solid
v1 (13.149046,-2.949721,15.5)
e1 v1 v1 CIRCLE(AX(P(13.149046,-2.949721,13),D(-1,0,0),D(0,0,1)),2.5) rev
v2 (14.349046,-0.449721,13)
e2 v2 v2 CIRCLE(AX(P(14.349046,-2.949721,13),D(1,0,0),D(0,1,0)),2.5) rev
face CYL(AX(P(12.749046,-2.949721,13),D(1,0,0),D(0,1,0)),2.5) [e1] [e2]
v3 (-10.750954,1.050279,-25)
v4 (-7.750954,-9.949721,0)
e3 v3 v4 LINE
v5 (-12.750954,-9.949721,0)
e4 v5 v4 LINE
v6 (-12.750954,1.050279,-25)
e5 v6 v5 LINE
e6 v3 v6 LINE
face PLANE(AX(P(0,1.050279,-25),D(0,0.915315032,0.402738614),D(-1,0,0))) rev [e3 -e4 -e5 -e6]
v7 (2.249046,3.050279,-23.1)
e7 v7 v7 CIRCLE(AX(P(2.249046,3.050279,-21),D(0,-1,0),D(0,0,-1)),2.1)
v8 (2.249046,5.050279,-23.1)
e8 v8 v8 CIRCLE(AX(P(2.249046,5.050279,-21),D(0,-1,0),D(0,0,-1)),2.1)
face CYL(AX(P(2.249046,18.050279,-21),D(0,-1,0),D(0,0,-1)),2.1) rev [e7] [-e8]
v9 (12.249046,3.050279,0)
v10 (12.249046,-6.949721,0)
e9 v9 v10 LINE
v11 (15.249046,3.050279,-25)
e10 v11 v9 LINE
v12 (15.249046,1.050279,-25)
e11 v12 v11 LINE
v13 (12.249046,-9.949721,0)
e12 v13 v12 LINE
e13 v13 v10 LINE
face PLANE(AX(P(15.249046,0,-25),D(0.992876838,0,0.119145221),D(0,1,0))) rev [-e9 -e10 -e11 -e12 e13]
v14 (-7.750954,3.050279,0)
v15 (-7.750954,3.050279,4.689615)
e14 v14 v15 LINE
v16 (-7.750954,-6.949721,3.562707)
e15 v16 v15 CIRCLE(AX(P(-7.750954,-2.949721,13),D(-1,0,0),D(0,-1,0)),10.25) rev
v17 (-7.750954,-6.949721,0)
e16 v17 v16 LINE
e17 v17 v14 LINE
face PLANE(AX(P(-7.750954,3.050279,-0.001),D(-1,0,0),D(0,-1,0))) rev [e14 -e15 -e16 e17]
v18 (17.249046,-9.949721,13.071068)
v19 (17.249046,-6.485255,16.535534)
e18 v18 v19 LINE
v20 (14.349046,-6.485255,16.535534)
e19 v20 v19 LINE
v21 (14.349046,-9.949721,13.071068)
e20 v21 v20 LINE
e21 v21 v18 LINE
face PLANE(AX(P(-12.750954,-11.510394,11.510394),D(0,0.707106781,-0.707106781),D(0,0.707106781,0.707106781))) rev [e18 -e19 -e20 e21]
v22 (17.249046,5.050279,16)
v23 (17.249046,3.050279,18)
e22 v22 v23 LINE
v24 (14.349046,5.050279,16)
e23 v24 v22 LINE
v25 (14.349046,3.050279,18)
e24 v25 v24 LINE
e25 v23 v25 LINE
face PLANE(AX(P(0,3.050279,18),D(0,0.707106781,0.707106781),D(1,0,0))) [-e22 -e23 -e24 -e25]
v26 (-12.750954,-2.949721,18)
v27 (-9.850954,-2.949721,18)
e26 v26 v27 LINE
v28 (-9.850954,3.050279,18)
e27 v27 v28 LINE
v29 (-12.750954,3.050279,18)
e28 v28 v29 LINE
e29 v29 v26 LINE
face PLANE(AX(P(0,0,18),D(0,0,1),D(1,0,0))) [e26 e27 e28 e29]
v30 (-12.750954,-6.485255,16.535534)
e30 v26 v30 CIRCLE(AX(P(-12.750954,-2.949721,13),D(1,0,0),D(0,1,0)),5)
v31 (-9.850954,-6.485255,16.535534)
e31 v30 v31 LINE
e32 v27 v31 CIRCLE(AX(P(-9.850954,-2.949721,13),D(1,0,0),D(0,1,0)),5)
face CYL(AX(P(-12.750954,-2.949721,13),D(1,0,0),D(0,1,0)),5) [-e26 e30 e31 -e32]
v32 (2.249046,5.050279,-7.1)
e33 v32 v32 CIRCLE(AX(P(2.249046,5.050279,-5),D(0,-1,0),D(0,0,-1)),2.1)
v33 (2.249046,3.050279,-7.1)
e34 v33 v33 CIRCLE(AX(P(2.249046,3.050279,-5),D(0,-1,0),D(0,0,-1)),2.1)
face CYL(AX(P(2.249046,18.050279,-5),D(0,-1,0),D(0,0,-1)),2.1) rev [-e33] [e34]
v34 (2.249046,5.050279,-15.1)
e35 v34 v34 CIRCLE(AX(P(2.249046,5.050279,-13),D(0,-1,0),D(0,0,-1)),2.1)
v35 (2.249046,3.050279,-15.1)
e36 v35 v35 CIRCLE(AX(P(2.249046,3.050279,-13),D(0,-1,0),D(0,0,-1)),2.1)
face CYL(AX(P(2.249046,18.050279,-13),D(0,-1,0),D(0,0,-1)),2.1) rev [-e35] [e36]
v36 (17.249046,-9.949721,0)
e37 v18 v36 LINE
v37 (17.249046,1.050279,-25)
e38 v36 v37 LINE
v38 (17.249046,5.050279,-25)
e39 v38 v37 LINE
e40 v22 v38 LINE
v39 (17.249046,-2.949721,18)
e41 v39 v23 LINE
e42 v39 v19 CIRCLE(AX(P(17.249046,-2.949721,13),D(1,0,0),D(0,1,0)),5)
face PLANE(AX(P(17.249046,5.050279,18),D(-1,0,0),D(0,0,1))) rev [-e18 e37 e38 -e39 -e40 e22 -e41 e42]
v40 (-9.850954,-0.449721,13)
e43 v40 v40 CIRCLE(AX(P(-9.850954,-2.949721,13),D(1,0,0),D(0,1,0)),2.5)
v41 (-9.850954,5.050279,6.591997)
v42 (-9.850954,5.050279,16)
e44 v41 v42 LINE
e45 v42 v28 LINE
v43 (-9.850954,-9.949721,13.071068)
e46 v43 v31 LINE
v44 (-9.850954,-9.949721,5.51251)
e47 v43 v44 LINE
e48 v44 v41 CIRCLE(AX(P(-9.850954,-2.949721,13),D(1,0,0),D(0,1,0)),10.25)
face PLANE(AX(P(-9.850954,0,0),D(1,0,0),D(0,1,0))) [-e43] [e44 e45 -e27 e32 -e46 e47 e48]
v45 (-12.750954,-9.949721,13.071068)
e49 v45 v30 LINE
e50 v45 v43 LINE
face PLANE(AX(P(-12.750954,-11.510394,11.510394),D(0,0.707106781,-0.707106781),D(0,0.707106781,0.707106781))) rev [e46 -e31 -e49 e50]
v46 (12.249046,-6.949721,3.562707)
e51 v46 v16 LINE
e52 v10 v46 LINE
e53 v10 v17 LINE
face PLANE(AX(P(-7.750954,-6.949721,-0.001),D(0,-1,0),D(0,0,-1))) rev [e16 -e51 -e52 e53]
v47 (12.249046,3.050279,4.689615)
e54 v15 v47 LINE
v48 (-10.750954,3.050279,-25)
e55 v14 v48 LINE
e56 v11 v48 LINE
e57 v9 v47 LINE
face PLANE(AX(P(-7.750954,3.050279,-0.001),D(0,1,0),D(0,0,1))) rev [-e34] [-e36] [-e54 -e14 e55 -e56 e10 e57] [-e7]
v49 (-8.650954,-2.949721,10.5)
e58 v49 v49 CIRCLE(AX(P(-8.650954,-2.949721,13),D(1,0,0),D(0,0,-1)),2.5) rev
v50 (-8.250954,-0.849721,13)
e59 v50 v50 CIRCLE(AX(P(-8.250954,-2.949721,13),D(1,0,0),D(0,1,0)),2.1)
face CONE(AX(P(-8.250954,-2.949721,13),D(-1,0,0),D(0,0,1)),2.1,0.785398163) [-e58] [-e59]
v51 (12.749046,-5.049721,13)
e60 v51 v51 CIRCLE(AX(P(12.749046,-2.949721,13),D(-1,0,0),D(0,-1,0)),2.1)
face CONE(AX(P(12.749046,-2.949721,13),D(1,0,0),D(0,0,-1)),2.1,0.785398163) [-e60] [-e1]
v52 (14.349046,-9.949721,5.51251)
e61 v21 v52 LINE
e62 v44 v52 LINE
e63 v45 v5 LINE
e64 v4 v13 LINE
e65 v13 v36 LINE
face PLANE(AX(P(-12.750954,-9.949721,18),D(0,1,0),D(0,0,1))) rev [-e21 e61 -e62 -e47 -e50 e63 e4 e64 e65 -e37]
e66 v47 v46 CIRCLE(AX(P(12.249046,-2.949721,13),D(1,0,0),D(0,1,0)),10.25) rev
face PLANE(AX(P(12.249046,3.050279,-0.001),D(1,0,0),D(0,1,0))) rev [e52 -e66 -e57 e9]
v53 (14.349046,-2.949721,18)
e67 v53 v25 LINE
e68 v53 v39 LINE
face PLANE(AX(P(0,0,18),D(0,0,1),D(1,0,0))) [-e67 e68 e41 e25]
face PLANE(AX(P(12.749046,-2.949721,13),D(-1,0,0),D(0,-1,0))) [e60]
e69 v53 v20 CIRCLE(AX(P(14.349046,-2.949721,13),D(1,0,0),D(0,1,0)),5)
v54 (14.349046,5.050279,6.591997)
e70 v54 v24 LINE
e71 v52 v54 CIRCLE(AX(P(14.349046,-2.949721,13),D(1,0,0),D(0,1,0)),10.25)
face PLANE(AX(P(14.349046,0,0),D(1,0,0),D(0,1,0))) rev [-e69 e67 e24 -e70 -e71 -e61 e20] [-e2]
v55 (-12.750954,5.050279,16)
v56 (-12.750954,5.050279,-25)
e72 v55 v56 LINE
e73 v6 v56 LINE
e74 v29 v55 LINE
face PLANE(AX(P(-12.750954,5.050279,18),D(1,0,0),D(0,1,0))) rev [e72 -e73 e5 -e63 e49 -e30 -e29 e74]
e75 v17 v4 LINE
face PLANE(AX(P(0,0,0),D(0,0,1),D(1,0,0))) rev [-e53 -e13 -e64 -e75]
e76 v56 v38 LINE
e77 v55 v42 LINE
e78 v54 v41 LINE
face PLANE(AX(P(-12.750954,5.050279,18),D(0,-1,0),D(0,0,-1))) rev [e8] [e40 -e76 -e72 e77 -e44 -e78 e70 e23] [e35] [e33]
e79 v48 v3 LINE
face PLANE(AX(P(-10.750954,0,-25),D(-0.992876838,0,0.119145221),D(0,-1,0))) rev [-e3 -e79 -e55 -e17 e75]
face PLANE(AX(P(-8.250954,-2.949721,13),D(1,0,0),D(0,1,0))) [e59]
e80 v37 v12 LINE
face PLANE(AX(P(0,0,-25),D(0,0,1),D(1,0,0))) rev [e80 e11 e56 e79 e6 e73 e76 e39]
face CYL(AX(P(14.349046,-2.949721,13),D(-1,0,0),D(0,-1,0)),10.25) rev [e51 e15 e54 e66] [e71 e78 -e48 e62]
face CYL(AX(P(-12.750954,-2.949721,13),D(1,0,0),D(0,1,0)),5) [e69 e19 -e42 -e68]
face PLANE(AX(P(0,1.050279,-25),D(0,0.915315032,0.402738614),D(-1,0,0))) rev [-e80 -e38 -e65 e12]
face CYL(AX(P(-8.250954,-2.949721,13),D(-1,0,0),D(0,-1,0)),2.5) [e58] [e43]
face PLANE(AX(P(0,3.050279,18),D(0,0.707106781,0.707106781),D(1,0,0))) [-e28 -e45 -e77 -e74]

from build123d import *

# Parameters (mm, degrees)
SKETCH_1_W               = 30
SKETCH_1_H               = 15
EXTRUDE_1_DEPTH          = 18
CUT_EXTRUDE_1_REACH      = 28.843
SKETCH_2_W               = 20
SKETCH_2_H               = 10
CUT_EXTRUDE_2_REACH      = 29.668
SKETCH_3_W               = 20
SKETCH_3_H               = 12
CUT_EXTRUDE_5_DEPTH      = 22.1
CUT_EXTRUDE_5_DEPTH_BACK = 2.1
SKETCH_4_W               = 5
SKETCH_4_H               = 6
SKETCH_5_R               = 2.5
EXTRUDE_2_DEPTH          = 1.6
EXTRUDE_START            = 1.6
SKETCH_6_R               = 2.5
EXTRUDE_3_DEPTH          = 1.6
CHAMFER_1_SIZE           = 0.4
CUT_EXTRUDE_6_DEPTH      = 35.020684023
CUT_EXTRUDE_6_DEPTH_BACK = 35.020684023
CUT_EXTRUDE_7_DEPTH      = 35.020684023
CUT_EXTRUDE_7_DEPTH_BACK = 35.020684023
CHAMFER_2_SIZE           = 2
EXTRUDE_4_DEPTH          = 25
CHAMFER_3_SIZE           = 25
CHAMFER_3_SIZE2          = 11
SKETCH_10_R              = 2.1
CUT_EXTRUDE_8_DEPTH      = 15
CHAMFER_4_SIZE           = 3
CHAMFER_4_SIZE_2         = 25


with BuildPart() as part:
    # 草圖1 → 填料-伸長1 (new body)
    with BuildSketch(Plane.XY):
        with Locations((2.249045701, -2.44972067)):
            Rectangle(SKETCH_1_W, SKETCH_1_H)
    extrude(amount=EXTRUDE_1_DEPTH)

    # 草圖2 → 除料-伸長1 (cut, up to next)
    with BuildSketch(Plane.XY.offset(18), mode=Mode.PRIVATE) as cut_extrude_1_sk1:
        with Locations((2.249045701, -1.94972067)):
            Rectangle(SKETCH_2_W, SKETCH_2_H)
    cut_extrude_1_tool1 = extrude(cut_extrude_1_sk1.sketch, amount=-CUT_EXTRUDE_1_REACH, mode=Mode.PRIVATE) & part.part
    add(cut_extrude_1_tool1.solids().sort_by_distance((2.249046, -1.949721, 18))[0], mode=Mode.SUBTRACT)

    # 草圖3 → 除料-伸長2 (cut, up to next)
    with BuildSketch(Plane(origin=(0, -6.94972067, 0), x_dir=(1, 0, 0), z_dir=(0, 1, 0)), mode=Mode.PRIVATE) as cut_extrude_2_sk1:
        with Locations((2.249045701, -12)):
            Rectangle(SKETCH_3_W, SKETCH_3_H)
    cut_extrude_2_tool1 = extrude(cut_extrude_2_sk1.sketch, amount=-CUT_EXTRUDE_2_REACH, mode=Mode.PRIVATE) & part.part
    add(cut_extrude_2_tool1.solids().sort_by_distance((2.249046, -6.949721, 12))[0], mode=Mode.SUBTRACT)

    # 草圖4 → 除料-伸長5 (cut, two sides: drawn at the far end of the back side and taken through both)
    with BuildSketch(Plane(origin=(-7.750954299, 0, 0), x_dir=(0, 0, -1), z_dir=(1, 0, 0)).offset(-CUT_EXTRUDE_5_DEPTH_BACK)):
        with Locations((-15.5, 0.05027933)):
            Rectangle(SKETCH_4_W, SKETCH_4_H)
        with BuildLine():
            Line((-13, 3.05027933), (-13, -2.94972067))
            Line((-13, -2.94972067), (-18, -2.94972067))
            Line((-18, -2.94972067), (-18, -9.94972067))
            Line((-18, -9.94972067), (-6, -9.94972067))
            Line((-6, -9.94972067), (-6, -6.94972067))
            Line((-6, -6.94972067), (-3.562706956, -6.94972067))
            ThreePointArc((-3.562706956, -6.94972067), (-2.955231369, -4.990584005), (-2.75, -2.94972067))
            ThreePointArc((-2.75, -2.94972067), (-3.246950555, 0.203139384), (-4.689614931, 3.05027933))
            Line((-4.689614931, 3.05027933), (-13, 3.05027933))
        make_face()
        with BuildLine():
            ThreePointArc((-18, 5.998044414), (-15.583399687, 6.969379392), (-13, 7.30027933))
            Line((-13, 7.30027933), (-13, 7.89449882))
            Line((-13, 7.89449882), (-18, 7.89449882))
            Line((-18, 7.89449882), (-18, 5.998044414))
        make_face()
        with BuildLine():
            Line((-13, 7.30027933), (-13, 3.05027933))
            Line((-13, 3.05027933), (-4.689614931, 3.05027933))
            ThreePointArc((-4.689614931, 3.05027933), (-8.332961324, 6.176135454), (-13, 7.30027933))
        make_face()
        with BuildLine():
            Line((-18, 3.05027933), (-13, 3.05027933))
            Line((-13, 3.05027933), (-13, 7.30027933))
            ThreePointArc((-13, 7.30027933), (-15.583399687, 6.969379392), (-18, 5.998044414))
            Line((-18, 5.998044414), (-18, 3.05027933))
        make_face()
        with BuildLine():
            Line((-18, -9.94972067), (-18, -2.94972067))
            Line((-18, -2.94972067), (-18, 3.05027933))
            Line((-18, 3.05027933), (-18, 5.998044414))
            ThreePointArc((-18, 5.998044414), (-19.843504041, -10.580510436), (-3.562706956, -6.94972067))
            Line((-3.562706956, -6.94972067), (-6, -6.94972067))
            Line((-6, -6.94972067), (-6, -9.94972067))
            Line((-6, -9.94972067), (-18, -9.94972067))
        make_face()
    extrude(amount=CUT_EXTRUDE_5_DEPTH + CUT_EXTRUDE_5_DEPTH_BACK, mode=Mode.SUBTRACT)

    # 草圖5 → 填料-伸長2 (add)
    with BuildSketch(Plane.ZY.offset(-14.349045701)):
        with Locations(Location((13, -2.94972067, 0), (0, 0, 90))):
            Circle(SKETCH_5_R)
    extrude(amount=EXTRUDE_2_DEPTH)

    # 草圖6 → 填料-伸長3 (add)
    with BuildSketch(Plane(origin=(-9.850954299, 0, 0), x_dir=(0, 0, -1), z_dir=(1, 0, 0)).offset(EXTRUDE_START)):
        with Locations(Location((-13, -2.94972067, 0), (0, 0, 90))):
            Circle(SKETCH_6_R)
    extrude(amount=-EXTRUDE_3_DEPTH)

    # 導角1
    chamfer_1_edges = [part.edges().sort_by_distance(p)[0] for p in [
        (12.749045701, -5.44972067, 13),
        (-8.250954299, -5.44972067, 13),
    ]]
    chamfer(chamfer_1_edges, length=CHAMFER_1_SIZE)

    # 草圖7 → 除料-伸長6 (cut, two sides: drawn at the far end of the back side and taken through both)
    with BuildSketch(Plane(origin=(-9.850954299, 0, 0), x_dir=(0, 0, -1), z_dir=(1, 0, 0)).offset(-CUT_EXTRUDE_6_DEPTH_BACK)):
        Polygon((-18, -9.94972067), (-13.071067812, -9.94972067), (-18, -5.020788482), align=None)
    extrude(amount=CUT_EXTRUDE_6_DEPTH + CUT_EXTRUDE_6_DEPTH_BACK, mode=Mode.SUBTRACT)

    # 草圖8 → 除料-伸長7 (cut, two sides: drawn at the far end of the back side and taken through both)
    with BuildSketch(Plane(origin=(-9.850954299, 0, 0), x_dir=(0, 0, -1), z_dir=(1, 0, 0)).offset(-CUT_EXTRUDE_7_DEPTH_BACK)):
        with BuildLine():
            Line((-18, -2.94972067), (-18, -5.020788482))
            Line((-18, -5.020788482), (-16.535533871, -6.485254612))
            ThreePointArc((-16.535533871, -6.485254612), (-17.619397653, -4.863137855), (-18, -2.94972067))
        make_face()
    extrude(amount=CUT_EXTRUDE_7_DEPTH + CUT_EXTRUDE_7_DEPTH_BACK, mode=Mode.SUBTRACT)

    # 導角2
    chamfer_2_edges = [part.edges().sort_by_distance(p)[0] for p in [
        (15.799045701, 5.05027933, 18),
        (-11.300954299, 5.05027933, 18),
    ]]
    chamfer(chamfer_2_edges, length=CHAMFER_2_SIZE)

    # 草圖9 → 填料-伸長4 (add)
    with BuildSketch(Plane(origin=(0, 0, 0), x_dir=(-1, 0, 0), z_dir=(0, 0, -1))):
        Polygon((-12.249045701, 3.05027933), (-12.249045701, -9.94972067), (-17.249045701, -9.94972067), (-17.249045701, 5.05027933), (12.750954299, 5.05027933), (12.750954299, -9.94972067), (7.750954299, -9.94972067), (7.750954299, 3.05027933), align=None)
    extrude(amount=EXTRUDE_4_DEPTH)

    # 導角3
    chamfer_3_edges = [part.edges().sort_by_distance(p)[0] for p in [
        (-10.250954299, -9.94972067, -25),
        (14.749045701, -9.94972067, -25),
    ]]
    chamfer_3_side = [part.faces().sort_by_distance(p)[0] for p in [
        (2.249045701, -9.94972067, 0.484706737),
    ]]
    chamfer(chamfer_3_edges, length=CHAMFER_3_SIZE, length2=CHAMFER_3_SIZE2, reference=chamfer_3_side[0])

    # 草圖10 → 除料-伸長8 (cut)
    with BuildSketch(Plane.XZ.offset(-3.05027933)):
        with Locations(Location((2.249045701, -21, 0), (0, 0, 270))):
            Circle(SKETCH_10_R)
        with Locations(Location((2.249045701, -13, 0), (0, 0, 270))):
            Circle(SKETCH_10_R)
        with Locations(Location((2.249045701, -5, 0), (0, 0, 270))):
            Circle(SKETCH_10_R)
    extrude(amount=-CUT_EXTRUDE_8_DEPTH, mode=Mode.SUBTRACT)

    # 導角4
    # the kernel refuses this chamfer: 25, 3 mm, written as the material it takes off along each edge
    with BuildSketch(Plane(origin=(-7.750954299, -63.93259543, -25), x_dir=(-0.952888564534268, 0, -0.3033205953769419), z_dir=(0, 1, 0)), Plane(origin=(12.249045701, 3.05027933, -25), x_dir=(0.952888564534268, 0, -0.3033205953769419), z_dir=(0, -1, 0))) as chamfer_4_piece_1:
        Polygon((CHAMFER_4_SIZE * 0.952888564534, CHAMFER_4_SIZE * 0.303320595377), (-CHAMFER_4_SIZE_2 * 0.303320595377, CHAMFER_4_SIZE_2 * 0.952888564534), (0, 0), align=None)
    extrude(amount=66.98287476, mode=Mode.SUBTRACT)


solid = part.part
